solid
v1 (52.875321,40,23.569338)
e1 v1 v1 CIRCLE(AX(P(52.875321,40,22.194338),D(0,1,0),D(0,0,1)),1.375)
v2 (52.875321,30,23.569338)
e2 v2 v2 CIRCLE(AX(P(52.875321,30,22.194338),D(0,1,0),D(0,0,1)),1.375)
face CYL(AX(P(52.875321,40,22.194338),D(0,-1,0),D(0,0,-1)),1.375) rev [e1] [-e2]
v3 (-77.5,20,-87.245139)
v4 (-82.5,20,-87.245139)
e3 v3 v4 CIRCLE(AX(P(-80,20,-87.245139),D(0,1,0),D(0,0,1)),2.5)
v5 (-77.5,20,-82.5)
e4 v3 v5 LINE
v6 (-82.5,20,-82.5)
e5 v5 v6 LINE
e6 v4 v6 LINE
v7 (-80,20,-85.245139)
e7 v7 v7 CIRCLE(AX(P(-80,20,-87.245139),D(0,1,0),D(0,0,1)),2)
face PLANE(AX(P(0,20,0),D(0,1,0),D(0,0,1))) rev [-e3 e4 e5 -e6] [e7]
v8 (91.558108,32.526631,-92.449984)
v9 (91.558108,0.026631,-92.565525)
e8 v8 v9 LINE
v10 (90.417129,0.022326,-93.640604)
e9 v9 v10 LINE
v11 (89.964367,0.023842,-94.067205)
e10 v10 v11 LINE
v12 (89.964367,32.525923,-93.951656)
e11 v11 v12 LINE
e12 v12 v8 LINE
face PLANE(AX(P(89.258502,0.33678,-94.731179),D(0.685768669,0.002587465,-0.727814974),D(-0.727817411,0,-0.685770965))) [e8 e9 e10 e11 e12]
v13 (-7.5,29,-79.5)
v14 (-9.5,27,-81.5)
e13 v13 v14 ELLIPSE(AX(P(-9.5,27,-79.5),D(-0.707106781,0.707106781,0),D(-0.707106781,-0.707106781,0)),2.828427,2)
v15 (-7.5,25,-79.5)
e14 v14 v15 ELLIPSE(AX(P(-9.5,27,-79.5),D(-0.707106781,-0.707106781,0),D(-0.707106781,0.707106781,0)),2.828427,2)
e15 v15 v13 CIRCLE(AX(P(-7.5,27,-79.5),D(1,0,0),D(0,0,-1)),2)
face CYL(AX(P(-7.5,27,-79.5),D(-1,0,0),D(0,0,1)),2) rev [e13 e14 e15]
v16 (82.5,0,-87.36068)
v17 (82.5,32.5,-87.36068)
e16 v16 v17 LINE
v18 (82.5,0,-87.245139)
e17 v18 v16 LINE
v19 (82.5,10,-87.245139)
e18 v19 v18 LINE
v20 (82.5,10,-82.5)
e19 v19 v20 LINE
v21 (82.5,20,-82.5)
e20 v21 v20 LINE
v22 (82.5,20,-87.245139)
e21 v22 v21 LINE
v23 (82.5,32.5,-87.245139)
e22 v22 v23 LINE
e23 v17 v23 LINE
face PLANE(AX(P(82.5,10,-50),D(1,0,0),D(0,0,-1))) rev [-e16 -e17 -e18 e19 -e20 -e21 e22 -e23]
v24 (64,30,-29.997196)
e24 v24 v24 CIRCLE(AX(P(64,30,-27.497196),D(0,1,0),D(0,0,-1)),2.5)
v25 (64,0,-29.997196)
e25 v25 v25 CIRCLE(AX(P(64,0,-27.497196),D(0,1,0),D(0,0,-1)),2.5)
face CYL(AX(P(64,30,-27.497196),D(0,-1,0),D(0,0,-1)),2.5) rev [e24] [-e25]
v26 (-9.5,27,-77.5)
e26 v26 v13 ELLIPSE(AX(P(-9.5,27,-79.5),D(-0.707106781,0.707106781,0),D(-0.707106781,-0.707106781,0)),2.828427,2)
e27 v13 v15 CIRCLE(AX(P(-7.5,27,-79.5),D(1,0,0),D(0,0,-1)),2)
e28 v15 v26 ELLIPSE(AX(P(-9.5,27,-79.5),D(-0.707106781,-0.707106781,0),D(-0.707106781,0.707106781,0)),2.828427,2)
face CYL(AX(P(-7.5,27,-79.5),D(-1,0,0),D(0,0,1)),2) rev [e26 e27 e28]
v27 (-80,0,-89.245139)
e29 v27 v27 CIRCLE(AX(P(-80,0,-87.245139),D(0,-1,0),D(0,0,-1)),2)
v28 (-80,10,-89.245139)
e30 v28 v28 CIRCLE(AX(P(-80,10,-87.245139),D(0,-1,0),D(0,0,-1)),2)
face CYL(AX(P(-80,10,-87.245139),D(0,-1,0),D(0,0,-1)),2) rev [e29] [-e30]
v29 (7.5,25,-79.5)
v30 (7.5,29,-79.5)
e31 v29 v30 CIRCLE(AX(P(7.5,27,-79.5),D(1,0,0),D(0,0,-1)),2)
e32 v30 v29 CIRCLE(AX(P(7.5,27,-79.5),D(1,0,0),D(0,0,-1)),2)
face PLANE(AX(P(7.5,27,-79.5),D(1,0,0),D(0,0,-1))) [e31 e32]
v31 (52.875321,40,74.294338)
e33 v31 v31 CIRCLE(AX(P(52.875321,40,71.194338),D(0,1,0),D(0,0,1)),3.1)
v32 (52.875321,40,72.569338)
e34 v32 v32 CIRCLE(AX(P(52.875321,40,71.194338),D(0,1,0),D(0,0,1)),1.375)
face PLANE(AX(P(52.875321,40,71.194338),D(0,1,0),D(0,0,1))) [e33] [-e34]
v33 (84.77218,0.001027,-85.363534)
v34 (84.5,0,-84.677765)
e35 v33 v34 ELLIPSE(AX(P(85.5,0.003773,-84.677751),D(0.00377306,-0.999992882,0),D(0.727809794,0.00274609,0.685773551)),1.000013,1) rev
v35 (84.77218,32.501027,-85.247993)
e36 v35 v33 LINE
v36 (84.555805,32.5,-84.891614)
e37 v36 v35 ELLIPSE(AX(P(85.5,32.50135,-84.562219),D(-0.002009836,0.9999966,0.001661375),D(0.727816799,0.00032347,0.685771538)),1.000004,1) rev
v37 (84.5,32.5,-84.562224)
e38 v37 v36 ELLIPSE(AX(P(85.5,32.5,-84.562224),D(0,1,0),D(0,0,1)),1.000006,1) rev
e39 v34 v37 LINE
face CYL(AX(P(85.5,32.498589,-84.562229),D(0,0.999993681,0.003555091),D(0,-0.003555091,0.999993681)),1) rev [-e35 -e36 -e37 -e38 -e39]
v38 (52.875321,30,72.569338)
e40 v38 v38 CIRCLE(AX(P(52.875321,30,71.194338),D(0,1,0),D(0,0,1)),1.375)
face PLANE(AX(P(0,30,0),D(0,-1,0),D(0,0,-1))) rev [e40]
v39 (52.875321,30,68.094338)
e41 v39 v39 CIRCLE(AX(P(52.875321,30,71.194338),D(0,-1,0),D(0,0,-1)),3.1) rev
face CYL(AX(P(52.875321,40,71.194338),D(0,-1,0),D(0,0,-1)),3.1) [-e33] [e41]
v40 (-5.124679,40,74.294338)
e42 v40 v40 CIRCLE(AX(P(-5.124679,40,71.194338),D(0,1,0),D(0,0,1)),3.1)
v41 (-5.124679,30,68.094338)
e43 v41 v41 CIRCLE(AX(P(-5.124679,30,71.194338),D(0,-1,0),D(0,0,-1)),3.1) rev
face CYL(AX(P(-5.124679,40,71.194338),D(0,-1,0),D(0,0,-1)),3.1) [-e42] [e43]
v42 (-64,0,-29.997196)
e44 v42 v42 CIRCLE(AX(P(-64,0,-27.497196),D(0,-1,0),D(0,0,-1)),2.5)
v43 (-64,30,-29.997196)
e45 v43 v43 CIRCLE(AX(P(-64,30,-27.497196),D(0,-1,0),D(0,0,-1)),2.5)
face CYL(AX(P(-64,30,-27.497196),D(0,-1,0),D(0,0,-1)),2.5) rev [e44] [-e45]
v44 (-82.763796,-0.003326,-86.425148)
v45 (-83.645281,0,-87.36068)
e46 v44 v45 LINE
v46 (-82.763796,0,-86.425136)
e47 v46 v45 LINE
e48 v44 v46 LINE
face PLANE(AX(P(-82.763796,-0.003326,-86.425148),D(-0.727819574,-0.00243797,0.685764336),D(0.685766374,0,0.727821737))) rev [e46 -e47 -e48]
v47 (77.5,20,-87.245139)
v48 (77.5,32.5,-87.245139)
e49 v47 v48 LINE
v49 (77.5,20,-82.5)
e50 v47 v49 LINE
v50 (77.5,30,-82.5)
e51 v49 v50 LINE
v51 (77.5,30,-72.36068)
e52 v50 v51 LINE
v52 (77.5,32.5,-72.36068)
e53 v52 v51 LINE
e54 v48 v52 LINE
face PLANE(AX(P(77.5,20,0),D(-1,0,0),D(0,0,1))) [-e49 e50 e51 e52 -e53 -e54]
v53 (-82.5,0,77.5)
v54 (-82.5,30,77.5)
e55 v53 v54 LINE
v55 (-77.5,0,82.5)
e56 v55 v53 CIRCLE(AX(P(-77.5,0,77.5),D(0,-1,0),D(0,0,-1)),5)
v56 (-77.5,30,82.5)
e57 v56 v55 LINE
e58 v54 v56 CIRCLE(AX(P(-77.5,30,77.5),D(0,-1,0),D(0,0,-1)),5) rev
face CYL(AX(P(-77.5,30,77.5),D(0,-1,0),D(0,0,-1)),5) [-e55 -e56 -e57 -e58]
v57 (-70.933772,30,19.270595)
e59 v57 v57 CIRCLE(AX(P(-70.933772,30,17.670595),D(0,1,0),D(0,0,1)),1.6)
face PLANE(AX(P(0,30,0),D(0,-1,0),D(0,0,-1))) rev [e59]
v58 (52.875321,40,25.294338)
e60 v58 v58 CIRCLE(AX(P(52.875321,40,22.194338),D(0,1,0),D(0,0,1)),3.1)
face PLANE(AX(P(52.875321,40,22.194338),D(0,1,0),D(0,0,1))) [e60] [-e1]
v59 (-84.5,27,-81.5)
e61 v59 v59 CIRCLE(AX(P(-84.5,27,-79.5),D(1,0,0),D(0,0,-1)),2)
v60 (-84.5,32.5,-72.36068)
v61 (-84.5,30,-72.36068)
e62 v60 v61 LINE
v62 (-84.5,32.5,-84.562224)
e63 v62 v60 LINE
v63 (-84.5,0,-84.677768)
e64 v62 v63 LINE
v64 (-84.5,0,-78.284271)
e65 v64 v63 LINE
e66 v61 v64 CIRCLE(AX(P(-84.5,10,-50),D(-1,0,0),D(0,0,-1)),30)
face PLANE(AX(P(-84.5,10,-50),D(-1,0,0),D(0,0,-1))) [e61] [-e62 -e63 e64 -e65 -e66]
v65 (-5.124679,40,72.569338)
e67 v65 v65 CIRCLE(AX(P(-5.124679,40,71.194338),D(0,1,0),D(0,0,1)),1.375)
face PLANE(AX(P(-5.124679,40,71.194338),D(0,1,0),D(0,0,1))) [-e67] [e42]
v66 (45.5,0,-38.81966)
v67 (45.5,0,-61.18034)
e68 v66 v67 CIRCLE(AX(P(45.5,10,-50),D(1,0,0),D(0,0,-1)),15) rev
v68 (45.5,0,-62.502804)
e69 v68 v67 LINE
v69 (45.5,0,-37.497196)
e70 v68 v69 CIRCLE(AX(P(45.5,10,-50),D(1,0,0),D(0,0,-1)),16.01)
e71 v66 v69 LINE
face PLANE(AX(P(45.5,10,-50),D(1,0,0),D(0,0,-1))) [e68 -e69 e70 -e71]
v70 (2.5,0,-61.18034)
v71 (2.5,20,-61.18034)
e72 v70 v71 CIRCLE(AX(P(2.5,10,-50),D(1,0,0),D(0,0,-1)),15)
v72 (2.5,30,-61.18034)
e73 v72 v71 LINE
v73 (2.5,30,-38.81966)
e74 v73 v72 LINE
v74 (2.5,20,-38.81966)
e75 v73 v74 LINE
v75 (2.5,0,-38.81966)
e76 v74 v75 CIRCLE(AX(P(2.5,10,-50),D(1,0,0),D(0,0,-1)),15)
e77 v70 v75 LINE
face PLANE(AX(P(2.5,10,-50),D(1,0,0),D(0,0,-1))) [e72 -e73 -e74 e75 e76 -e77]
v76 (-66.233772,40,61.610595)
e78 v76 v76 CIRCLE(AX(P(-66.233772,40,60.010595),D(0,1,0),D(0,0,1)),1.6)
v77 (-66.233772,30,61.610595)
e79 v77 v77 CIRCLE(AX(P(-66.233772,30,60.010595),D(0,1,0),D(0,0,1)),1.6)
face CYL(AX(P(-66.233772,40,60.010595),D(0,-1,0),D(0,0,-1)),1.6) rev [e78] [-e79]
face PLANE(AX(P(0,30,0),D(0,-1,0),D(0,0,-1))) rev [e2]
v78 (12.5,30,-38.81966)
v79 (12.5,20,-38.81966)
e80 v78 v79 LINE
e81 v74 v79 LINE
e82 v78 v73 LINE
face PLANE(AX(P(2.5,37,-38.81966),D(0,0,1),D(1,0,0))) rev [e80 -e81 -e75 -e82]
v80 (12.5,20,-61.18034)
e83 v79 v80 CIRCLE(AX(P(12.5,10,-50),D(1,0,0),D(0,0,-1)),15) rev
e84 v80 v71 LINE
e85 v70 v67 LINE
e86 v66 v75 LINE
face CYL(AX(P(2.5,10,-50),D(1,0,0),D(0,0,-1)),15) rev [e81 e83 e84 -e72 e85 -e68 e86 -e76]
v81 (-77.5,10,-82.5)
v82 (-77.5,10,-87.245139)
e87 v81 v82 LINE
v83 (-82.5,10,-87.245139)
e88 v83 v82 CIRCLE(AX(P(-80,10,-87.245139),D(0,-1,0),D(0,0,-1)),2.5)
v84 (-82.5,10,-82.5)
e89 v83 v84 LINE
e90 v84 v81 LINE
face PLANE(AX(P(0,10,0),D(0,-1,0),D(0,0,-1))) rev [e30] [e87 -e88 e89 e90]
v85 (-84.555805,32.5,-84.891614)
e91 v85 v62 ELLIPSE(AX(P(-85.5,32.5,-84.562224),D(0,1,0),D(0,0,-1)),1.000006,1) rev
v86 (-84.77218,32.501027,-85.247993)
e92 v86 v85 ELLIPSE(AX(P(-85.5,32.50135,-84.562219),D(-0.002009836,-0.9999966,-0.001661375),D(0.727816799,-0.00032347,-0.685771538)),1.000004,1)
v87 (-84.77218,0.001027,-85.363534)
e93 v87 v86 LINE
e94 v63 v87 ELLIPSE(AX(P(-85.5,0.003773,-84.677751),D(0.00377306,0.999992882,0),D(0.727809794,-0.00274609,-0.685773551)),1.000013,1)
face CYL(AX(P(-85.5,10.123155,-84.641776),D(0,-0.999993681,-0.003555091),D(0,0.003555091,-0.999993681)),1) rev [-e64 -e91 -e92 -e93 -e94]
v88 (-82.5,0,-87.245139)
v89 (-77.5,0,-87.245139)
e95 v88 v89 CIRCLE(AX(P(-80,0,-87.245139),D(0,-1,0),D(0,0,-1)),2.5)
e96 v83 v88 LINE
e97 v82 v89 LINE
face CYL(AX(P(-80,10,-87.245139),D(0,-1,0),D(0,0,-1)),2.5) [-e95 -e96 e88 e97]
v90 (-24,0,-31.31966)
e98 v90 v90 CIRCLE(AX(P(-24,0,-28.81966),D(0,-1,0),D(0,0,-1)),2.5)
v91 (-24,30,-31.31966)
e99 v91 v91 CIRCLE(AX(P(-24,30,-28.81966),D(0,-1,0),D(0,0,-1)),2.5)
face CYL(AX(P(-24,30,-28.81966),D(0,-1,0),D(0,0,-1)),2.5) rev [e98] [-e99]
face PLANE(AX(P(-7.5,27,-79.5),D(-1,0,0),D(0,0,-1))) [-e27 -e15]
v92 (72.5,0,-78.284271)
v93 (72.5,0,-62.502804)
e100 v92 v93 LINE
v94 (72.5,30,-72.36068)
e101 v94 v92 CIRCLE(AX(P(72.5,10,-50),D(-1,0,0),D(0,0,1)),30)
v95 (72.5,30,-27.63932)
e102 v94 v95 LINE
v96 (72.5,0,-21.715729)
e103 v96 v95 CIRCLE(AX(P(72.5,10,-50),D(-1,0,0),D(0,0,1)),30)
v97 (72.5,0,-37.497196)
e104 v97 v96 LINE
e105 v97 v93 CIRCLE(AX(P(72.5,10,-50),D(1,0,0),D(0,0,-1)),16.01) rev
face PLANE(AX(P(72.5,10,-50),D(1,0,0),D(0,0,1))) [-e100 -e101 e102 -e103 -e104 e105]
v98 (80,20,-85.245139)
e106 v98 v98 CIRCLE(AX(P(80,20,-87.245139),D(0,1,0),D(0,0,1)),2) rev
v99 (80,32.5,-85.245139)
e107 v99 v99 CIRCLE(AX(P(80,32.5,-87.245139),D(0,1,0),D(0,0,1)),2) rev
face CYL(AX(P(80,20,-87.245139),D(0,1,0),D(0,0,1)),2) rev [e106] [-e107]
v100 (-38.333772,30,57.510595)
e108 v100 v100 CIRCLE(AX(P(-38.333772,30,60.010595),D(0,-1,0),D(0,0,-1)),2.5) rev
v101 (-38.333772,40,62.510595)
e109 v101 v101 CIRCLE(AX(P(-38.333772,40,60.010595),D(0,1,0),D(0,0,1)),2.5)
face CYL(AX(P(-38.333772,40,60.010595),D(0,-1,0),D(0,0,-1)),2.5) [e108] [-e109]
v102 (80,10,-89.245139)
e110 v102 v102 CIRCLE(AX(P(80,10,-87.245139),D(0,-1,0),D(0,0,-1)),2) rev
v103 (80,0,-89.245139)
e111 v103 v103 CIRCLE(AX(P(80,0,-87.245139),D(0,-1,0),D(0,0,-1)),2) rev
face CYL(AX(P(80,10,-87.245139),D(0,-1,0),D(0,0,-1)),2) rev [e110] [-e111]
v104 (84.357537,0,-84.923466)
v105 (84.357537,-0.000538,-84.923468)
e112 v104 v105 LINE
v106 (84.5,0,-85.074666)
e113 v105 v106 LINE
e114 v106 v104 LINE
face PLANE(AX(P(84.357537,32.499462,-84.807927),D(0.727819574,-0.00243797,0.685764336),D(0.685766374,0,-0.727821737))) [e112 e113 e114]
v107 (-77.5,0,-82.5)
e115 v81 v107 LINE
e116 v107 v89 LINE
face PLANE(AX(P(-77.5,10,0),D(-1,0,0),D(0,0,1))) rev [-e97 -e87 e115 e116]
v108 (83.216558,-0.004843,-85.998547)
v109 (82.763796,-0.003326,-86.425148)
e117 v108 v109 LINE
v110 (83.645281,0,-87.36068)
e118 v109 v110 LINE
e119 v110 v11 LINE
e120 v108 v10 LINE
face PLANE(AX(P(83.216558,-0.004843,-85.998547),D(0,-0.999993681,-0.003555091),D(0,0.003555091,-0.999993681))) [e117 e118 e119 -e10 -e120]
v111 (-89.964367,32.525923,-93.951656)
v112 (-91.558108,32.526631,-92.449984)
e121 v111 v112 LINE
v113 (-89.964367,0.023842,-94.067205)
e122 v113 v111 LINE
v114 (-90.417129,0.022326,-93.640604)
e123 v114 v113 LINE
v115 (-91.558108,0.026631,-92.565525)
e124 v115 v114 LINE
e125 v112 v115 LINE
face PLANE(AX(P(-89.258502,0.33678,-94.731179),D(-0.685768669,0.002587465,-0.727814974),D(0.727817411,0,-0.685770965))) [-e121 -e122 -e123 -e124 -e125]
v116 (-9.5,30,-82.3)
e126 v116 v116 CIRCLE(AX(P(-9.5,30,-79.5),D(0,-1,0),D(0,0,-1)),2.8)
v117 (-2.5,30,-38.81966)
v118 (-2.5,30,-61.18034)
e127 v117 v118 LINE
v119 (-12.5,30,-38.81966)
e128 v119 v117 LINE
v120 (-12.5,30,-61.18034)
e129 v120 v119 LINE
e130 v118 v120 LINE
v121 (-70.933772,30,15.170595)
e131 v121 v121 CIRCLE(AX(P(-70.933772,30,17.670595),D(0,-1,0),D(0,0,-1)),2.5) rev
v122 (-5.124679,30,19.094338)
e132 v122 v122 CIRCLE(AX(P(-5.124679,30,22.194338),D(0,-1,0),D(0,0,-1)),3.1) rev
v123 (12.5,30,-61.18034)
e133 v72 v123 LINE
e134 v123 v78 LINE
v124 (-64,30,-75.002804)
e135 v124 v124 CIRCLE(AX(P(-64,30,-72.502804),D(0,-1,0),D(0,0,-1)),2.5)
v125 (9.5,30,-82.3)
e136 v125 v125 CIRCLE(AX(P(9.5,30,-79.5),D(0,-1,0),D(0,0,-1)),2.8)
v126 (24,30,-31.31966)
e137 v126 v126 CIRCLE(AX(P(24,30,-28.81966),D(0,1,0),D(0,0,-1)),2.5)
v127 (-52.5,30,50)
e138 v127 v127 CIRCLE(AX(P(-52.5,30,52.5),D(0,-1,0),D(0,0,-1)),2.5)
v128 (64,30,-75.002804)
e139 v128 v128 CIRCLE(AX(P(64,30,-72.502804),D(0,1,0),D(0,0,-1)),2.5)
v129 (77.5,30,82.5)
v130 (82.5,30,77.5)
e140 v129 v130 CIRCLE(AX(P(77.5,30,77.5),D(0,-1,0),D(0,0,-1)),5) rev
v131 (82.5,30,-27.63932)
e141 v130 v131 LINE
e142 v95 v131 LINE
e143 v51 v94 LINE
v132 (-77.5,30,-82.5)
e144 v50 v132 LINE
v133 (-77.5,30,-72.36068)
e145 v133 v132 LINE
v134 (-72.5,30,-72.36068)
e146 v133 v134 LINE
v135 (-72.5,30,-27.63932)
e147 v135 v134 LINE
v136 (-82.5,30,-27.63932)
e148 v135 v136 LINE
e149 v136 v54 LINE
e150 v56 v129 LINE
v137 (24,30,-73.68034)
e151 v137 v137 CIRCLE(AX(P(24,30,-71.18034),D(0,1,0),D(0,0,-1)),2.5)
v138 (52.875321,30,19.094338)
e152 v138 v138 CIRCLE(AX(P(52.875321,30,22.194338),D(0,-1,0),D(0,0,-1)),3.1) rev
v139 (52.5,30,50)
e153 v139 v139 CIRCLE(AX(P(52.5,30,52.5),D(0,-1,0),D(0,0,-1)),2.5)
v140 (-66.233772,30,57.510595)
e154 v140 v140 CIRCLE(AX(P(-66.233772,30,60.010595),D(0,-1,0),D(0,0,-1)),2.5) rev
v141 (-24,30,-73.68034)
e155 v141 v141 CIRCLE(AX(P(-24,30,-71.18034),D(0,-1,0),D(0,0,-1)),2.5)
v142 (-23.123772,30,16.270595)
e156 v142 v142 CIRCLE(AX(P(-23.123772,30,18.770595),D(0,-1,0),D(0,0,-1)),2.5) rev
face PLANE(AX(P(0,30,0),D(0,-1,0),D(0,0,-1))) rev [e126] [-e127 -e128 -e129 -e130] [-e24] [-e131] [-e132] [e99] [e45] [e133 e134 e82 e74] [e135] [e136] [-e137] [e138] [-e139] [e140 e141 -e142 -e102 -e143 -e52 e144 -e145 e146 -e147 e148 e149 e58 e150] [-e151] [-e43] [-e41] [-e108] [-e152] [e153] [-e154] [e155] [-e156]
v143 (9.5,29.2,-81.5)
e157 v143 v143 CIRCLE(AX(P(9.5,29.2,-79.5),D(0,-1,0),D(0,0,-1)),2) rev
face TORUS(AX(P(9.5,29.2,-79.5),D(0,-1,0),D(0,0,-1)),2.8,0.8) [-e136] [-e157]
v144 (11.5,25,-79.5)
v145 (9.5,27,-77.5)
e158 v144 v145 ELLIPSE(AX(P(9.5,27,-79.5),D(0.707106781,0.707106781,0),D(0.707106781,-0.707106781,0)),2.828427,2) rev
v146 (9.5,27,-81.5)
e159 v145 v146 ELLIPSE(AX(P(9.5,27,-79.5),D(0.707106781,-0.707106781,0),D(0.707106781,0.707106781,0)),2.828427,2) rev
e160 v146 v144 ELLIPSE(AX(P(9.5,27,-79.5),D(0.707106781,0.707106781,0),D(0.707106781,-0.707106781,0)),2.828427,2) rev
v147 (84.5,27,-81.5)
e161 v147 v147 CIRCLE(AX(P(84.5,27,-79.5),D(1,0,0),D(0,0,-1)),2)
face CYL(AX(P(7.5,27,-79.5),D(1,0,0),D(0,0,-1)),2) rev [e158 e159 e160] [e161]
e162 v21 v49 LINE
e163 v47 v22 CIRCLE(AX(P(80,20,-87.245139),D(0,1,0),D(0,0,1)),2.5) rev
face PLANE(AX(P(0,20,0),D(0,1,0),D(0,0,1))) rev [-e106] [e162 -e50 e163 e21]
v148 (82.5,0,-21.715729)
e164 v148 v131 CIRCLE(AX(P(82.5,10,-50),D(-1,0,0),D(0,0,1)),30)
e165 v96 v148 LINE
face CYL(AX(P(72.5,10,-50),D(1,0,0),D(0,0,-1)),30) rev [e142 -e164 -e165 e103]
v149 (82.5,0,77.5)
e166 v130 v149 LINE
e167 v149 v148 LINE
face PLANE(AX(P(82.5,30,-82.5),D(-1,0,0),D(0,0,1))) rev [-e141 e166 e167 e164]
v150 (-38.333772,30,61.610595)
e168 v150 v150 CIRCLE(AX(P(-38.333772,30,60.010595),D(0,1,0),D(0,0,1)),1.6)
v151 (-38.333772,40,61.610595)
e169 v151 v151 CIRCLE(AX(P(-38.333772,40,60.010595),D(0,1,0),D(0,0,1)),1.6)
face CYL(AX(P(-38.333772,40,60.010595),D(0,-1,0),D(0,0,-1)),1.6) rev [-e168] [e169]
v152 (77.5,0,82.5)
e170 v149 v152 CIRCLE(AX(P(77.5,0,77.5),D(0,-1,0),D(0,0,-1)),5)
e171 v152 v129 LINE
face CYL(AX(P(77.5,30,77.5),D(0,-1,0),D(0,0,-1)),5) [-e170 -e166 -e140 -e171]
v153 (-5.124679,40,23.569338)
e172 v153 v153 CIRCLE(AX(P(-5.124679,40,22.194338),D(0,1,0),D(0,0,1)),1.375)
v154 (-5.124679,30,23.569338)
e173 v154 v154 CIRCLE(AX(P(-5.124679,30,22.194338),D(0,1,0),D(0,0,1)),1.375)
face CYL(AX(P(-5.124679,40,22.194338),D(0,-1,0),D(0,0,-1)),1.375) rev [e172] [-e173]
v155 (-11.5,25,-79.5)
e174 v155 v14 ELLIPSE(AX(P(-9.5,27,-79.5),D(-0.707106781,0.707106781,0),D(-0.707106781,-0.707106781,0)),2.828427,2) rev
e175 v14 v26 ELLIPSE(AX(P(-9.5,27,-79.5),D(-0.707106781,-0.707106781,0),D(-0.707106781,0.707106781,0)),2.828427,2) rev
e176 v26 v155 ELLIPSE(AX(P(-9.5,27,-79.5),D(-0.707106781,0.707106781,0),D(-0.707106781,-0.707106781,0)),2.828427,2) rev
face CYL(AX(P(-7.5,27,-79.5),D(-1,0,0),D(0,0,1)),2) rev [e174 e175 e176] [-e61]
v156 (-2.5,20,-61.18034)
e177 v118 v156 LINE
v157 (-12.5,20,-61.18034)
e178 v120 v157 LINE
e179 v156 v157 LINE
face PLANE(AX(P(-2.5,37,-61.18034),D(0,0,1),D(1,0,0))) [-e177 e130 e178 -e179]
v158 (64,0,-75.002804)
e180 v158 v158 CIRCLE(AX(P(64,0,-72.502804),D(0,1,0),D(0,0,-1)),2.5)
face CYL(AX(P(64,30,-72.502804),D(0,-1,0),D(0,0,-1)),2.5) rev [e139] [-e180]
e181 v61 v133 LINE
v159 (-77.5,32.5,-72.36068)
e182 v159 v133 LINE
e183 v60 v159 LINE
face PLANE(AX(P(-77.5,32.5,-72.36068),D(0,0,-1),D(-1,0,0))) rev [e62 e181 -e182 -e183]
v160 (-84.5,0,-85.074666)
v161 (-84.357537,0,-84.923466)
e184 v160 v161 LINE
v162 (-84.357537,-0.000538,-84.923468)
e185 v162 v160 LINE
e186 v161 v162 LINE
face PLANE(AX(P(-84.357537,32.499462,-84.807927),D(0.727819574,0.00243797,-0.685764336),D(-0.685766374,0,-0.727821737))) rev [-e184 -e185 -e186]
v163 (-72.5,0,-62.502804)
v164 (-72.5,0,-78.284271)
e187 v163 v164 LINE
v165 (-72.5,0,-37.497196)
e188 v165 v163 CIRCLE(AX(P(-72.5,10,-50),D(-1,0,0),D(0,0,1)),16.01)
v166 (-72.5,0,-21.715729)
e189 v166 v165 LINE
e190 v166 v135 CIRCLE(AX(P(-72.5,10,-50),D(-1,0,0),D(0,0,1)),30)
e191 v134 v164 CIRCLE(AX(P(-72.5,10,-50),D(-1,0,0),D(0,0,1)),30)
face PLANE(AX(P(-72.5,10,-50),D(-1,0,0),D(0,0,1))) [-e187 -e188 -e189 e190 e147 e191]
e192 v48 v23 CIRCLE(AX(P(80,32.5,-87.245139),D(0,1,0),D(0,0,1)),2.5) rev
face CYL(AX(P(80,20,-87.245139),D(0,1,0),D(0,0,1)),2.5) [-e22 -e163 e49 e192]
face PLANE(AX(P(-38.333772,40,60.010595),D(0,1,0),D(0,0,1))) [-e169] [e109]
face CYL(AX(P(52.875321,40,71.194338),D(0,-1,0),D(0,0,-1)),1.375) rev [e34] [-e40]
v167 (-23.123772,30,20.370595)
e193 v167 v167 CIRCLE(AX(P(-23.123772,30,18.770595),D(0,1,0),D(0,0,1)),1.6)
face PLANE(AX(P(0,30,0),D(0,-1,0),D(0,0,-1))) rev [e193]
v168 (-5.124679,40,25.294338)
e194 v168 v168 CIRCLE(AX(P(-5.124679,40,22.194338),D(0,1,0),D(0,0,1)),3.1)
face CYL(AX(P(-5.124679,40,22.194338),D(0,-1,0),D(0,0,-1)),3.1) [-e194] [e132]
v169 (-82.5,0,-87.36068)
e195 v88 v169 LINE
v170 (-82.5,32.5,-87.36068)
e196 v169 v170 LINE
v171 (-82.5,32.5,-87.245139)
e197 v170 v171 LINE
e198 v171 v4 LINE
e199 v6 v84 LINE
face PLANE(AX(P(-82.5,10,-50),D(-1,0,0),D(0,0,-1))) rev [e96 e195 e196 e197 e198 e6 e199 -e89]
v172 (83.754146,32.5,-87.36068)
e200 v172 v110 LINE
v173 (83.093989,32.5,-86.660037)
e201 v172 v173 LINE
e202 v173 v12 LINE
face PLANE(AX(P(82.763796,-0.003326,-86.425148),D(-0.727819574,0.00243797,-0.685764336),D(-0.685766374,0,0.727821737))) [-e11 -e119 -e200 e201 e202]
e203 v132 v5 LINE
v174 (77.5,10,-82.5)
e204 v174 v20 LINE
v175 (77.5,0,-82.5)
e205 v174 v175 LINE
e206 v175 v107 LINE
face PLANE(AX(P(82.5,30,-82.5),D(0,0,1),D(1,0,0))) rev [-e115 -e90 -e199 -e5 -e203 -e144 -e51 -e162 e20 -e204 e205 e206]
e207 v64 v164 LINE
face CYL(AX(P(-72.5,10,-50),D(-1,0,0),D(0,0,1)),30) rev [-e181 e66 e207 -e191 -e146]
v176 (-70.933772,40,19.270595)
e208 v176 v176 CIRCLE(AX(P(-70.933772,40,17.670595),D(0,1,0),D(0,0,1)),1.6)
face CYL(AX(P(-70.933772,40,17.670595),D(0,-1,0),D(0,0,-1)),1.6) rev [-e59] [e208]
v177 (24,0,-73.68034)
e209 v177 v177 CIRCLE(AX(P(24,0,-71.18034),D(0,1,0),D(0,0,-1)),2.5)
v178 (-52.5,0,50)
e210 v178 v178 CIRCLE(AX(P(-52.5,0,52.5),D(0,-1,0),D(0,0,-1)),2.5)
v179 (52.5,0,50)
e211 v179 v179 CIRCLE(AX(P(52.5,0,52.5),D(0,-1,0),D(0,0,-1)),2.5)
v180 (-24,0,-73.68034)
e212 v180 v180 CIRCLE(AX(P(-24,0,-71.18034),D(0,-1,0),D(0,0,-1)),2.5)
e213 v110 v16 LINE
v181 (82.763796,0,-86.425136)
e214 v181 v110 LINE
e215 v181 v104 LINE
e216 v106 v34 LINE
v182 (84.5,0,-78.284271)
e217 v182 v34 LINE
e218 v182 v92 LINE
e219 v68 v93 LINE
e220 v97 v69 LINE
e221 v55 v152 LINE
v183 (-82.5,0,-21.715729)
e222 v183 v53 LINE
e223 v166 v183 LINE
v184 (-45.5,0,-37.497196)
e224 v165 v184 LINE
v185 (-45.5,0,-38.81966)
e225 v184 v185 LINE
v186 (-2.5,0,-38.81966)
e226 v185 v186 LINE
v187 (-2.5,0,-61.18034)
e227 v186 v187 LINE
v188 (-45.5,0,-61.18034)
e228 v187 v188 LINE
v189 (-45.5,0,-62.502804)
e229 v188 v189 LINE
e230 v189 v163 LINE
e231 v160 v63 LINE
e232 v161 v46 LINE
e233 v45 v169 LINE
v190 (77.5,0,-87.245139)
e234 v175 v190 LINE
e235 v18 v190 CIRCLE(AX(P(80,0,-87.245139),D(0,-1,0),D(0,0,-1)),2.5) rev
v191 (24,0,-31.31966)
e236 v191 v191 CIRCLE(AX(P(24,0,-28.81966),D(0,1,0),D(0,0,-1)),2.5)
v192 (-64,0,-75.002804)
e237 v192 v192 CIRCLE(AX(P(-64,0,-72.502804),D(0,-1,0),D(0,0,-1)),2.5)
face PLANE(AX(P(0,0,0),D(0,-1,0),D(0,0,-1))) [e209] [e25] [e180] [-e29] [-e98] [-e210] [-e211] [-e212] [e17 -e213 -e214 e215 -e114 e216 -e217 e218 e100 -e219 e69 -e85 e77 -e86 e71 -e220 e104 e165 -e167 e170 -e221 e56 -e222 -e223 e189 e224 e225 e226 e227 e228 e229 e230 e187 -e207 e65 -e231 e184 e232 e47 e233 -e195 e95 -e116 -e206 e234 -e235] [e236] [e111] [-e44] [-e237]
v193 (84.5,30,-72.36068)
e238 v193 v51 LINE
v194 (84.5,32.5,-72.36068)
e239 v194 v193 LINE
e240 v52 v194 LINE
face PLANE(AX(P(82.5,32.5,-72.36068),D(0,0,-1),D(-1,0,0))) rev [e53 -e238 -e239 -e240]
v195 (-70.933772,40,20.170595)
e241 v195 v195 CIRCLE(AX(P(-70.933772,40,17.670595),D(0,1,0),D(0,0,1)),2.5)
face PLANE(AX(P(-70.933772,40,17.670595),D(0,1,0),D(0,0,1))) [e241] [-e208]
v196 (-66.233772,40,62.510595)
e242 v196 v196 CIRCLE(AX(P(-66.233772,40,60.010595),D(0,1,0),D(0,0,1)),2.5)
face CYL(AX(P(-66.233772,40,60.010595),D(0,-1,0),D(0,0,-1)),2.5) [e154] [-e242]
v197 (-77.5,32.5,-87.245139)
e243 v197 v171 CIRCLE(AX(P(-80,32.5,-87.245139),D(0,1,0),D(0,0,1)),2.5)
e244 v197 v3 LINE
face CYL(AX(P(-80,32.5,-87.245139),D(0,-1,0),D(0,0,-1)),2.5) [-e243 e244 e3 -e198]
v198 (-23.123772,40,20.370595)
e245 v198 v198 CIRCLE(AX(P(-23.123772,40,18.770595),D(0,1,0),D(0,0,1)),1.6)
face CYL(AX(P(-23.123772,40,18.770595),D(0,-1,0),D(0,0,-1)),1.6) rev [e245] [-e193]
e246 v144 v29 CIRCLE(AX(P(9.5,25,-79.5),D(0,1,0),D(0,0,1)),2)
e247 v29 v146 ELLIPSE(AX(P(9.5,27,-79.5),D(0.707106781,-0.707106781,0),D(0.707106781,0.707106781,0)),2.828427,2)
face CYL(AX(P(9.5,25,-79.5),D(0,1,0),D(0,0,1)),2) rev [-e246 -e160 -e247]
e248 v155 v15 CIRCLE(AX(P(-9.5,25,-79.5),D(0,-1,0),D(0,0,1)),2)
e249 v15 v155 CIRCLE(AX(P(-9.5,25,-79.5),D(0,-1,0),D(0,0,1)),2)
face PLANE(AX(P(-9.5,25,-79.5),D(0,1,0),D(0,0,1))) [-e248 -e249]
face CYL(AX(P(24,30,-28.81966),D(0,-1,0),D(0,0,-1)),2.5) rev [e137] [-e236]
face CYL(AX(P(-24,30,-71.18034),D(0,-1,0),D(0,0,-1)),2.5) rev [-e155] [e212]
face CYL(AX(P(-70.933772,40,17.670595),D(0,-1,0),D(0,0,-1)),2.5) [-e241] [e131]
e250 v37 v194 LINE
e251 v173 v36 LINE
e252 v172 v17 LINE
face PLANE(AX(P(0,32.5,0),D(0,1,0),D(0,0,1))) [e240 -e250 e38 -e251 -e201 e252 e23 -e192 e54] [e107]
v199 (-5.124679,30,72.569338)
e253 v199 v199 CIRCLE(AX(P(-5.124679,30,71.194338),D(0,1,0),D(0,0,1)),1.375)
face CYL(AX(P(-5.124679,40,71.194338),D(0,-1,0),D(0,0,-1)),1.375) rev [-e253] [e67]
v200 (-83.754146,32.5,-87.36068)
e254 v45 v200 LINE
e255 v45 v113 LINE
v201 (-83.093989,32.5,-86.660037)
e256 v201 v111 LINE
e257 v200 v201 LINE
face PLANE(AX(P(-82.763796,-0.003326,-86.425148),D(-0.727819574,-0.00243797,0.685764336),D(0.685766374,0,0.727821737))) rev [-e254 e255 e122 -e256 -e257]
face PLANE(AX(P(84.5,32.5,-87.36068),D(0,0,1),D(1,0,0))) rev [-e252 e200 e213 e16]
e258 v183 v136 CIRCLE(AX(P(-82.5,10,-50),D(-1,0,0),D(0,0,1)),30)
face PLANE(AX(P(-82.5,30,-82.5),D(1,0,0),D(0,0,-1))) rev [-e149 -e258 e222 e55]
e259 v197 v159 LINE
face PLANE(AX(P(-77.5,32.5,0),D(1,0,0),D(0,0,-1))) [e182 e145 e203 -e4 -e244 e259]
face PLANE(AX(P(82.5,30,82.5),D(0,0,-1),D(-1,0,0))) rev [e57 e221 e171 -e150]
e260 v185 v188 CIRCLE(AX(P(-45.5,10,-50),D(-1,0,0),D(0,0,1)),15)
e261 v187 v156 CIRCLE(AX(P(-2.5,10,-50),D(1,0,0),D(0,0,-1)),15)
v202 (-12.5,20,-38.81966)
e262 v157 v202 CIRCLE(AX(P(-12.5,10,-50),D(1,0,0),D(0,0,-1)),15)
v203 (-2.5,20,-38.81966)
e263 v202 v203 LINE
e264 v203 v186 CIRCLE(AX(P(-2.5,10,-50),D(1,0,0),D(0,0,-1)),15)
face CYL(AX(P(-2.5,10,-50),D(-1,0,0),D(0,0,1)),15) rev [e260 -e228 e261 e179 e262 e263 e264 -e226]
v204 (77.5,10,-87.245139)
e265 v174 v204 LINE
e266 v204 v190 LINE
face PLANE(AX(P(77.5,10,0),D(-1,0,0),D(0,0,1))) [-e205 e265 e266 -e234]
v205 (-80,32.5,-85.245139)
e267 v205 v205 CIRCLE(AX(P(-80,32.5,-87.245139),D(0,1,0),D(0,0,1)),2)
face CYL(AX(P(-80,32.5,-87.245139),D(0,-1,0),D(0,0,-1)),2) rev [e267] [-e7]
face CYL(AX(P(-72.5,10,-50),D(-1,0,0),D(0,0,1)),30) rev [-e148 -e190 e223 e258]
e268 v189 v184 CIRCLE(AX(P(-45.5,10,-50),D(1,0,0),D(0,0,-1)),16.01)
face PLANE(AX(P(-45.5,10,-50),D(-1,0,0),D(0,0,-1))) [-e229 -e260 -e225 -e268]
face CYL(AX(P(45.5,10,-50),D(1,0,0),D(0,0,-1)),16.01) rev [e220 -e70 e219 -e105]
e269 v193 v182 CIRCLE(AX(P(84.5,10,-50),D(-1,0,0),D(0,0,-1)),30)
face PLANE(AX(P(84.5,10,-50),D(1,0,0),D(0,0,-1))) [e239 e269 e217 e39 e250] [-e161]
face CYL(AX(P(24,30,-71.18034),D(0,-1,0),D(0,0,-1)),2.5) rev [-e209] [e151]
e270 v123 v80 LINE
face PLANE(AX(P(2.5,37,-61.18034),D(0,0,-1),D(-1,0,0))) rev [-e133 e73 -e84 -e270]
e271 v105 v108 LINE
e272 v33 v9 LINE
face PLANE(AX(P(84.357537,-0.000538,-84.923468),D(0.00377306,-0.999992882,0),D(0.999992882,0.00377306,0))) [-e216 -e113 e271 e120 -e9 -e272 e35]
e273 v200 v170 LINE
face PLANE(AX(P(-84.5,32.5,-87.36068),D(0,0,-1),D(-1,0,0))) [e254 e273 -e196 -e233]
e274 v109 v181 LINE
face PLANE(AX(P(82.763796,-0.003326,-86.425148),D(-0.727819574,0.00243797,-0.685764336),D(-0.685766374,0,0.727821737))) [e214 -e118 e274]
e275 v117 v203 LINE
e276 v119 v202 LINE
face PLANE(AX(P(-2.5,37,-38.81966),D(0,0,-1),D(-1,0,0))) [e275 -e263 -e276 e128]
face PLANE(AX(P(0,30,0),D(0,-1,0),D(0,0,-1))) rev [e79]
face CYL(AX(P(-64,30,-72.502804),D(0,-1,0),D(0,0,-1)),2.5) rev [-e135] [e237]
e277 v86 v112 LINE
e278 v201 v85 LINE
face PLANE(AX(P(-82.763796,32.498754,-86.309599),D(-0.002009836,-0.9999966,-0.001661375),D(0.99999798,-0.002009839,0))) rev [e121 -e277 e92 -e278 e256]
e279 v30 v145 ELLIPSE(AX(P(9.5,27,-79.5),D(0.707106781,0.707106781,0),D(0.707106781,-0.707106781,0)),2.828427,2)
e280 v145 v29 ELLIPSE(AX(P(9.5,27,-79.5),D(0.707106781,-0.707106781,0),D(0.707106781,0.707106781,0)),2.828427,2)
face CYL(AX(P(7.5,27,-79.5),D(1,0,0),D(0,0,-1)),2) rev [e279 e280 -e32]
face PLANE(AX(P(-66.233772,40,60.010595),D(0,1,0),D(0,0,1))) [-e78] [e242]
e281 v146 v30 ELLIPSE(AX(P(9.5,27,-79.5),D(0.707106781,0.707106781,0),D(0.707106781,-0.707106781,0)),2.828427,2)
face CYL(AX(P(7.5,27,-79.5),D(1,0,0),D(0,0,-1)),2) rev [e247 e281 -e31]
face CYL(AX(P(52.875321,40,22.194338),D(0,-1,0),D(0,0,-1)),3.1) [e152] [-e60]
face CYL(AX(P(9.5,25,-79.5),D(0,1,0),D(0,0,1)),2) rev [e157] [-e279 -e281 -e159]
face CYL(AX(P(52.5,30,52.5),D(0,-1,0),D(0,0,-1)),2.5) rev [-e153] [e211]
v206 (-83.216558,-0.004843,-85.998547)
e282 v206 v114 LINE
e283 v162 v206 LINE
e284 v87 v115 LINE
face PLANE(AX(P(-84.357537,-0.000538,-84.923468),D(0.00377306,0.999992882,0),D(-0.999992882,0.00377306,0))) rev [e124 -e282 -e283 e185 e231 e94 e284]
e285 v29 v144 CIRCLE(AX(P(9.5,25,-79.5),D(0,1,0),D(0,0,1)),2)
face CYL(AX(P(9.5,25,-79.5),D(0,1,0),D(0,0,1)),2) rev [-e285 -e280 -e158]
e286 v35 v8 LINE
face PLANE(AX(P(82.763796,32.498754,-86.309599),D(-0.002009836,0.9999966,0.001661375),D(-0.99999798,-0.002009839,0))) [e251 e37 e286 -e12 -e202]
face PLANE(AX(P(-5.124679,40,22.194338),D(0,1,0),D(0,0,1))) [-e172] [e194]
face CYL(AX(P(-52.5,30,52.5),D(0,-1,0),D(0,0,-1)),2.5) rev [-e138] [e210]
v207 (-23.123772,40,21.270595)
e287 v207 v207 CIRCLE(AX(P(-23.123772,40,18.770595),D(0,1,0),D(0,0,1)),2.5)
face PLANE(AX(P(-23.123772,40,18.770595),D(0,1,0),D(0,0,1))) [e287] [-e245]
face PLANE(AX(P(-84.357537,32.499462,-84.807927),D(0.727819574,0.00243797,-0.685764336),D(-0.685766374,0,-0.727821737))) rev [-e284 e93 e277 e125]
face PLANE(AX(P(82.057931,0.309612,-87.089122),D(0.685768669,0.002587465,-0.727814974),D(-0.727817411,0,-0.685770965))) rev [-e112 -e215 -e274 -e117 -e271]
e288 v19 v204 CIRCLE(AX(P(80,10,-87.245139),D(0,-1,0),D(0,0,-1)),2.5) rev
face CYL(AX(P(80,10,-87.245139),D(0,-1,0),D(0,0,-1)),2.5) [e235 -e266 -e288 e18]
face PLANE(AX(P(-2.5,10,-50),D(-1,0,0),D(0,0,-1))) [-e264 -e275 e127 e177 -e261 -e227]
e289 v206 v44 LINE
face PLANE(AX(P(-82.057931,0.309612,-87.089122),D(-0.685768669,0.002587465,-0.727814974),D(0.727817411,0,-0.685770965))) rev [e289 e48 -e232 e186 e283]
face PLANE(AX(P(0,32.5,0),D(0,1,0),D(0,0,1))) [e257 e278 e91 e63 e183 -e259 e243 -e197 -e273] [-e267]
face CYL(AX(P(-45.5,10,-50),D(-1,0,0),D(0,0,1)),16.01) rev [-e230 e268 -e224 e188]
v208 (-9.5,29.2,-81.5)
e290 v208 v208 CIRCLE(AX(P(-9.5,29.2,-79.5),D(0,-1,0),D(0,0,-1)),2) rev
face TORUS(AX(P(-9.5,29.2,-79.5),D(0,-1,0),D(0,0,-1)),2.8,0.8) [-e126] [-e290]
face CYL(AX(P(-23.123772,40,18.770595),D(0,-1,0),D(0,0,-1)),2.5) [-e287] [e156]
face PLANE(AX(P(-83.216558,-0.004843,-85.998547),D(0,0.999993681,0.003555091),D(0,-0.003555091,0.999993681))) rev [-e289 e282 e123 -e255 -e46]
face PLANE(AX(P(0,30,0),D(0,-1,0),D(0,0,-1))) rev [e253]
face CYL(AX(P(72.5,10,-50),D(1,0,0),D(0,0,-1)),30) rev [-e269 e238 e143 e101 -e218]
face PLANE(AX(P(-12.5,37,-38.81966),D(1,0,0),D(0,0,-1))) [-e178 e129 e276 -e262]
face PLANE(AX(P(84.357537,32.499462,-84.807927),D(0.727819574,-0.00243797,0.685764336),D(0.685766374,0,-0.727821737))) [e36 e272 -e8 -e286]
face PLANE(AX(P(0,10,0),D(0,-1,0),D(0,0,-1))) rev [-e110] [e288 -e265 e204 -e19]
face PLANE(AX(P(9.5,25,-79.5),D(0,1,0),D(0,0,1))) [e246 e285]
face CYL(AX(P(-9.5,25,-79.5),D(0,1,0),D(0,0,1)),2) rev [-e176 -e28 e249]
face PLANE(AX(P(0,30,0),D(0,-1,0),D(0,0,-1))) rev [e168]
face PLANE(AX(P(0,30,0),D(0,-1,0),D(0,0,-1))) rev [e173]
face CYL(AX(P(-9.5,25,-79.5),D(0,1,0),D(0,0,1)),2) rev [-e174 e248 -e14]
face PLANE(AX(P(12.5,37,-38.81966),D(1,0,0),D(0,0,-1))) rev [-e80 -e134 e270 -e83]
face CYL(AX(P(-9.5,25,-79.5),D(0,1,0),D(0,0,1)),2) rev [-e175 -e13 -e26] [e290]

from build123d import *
from build123d.topology import SkipClean

# Parameters (mm, degrees)
ESQUISSE2_W             = 165
ESQUISSE2_H             = 165
BASE_DEPTH              = 30
ESQUISSE3_R             = 15
BLOC_MOTEUR_1_DEPTH     = 80
ESQUISSE4_W             = 10
ESQUISSE4_H             = 22.360679774
ACCES_MOTEUR_DEPTH      = 37
ESQUISSE6_R             = 16.01
BLOC_MOTEUR_2_DEPTH     = 37
ESQUISSE7_R             = 2.5
VIS_MOTEUR_DEPTH        = 121.467838032
ESQUISSE8_R             = 2.5
VIS_PATIN_DEPTH         = 121.467838032
ESQUISSE9_R             = 3.1
ESQUISSE9_R_2           = 1.375
SUPPORT_RASP_DEPTH      = 10
ESQUISSE11_R            = 2.5
ESQUISSE11_R_2          = 1.6
SUPPORT_ARDUINO_DEPTH   = 10
CONGE_EXT_R             = 5
ESQUISSE12_R            = 30
ESPACE_ROUE_DEPTH       = 10
FIXE_PORTE_1_DEPTH      = 2.5
FIXE_PORTE_1_DEPTH_BACK = 10
ESQUISSE14_R            = 2
ESQUISSE15_W            = 5
ESQUISSE15_H            = 10.139320225
FIXE_PORTE_2_DEPTH      = 2.5
ESQUISSE16_R            = 2
FIXE_PORTE_3_DEPTH      = 10
ESQUISSE18_R            = 2
VIDE_CORDE_COTE_DEPTH   = 75
ESQUISSE19_R            = 2
VIDEO_CORDE_HAUT_DEPTH  = 5
CONGE_CORDE_R           = 0.8
ESQUISSE20_R            = 2
BOSS_MAX_PORTE_DEPTH    = 2
BOSS_START              = -0.5
BOSS_PORTE_45_DEPTH     = 10.5
CONGE_PORTE_45_R        = 1


with BuildPart() as part:
    # Esquisse2 → BASE (new body)
    with BuildSketch(Plane(origin=(0, 0, 0), x_dir=(1, 0, 0), z_dir=(0, 1, 0))):
        Rectangle(ESQUISSE2_W, ESQUISSE2_H)
    extrude(amount=BASE_DEPTH)

    # Esquisse3 → BLOC MOTEUR 1. (cut)
    with BuildSketch(Plane(origin=(82.5, 0, 0), x_dir=(0, 0, -1), z_dir=(1, 0, 0))):
        with Locations((50, 10)):
            Circle(ESQUISSE3_R)
    bloc_moteur_1 = extrude(amount=-BLOC_MOTEUR_1_DEPTH, mode=Mode.SUBTRACT)

    # Esquisse4 → ACCES MOTEUR (cut)
    with BuildSketch(Plane.XZ):
        with Locations((7.5, -50)):
            Rectangle(ESQUISSE4_W, ESQUISSE4_H)
    acces_moteur = extrude(amount=-ACCES_MOTEUR_DEPTH, mode=Mode.SUBTRACT)

    # Esquisse6 → BLOC MOTEUR 2 (cut)
    with BuildSketch(Plane(origin=(82.5, 0, 0), x_dir=(0, 0, -1), z_dir=(1, 0, 0))):
        with Locations((50, 10)):
            Circle(ESQUISSE6_R)
    bloc_moteur_2 = extrude(amount=-BLOC_MOTEUR_2_DEPTH, mode=Mode.SUBTRACT)

    # SYM BLOC MOTEUR: BLOC MOTEUR 1., ACCES MOTEUR, BLOC MOTEUR 2 across plane
    add(bloc_moteur_1.mirror(Plane(origin=(0, 0, 0), x_dir=(0, 0, 1), z_dir=(1, 0, 0))), mode=Mode.SUBTRACT)
    add(acces_moteur.mirror(Plane(origin=(0, 0, 0), x_dir=(0, 0, 1), z_dir=(1, 0, 0))), mode=Mode.SUBTRACT)
    add(bloc_moteur_2.mirror(Plane(origin=(0, 0, 0), x_dir=(0, 0, 1), z_dir=(1, 0, 0))), mode=Mode.SUBTRACT)

    # Esquisse7 → VIS MOTEUR (cut, through all)
    with BuildSketch(Plane.XZ):
        with Locations(Location((-64, -27.497196314, 0), (0, 0, 270))):
            Circle(ESQUISSE7_R)
        with Locations(Location((-24, -28.819660113, 0), (0, 0, 270))):
            Circle(ESQUISSE7_R)
        with Locations(Location((-24, -71.180339887, 0), (0, 0, 270))):
            Circle(ESQUISSE7_R)
        with Locations(Location((-64, -72.502803686, 0), (0, 0, 270))):
            Circle(ESQUISSE7_R)
    vis_moteur = extrude(amount=-VIS_MOTEUR_DEPTH, mode=Mode.SUBTRACT)

    # SYM VIS: VIS MOTEUR across plane
    add(vis_moteur.mirror(Plane(origin=(0, 0, 0), x_dir=(0, 0, 1), z_dir=(1, 0, 0))), mode=Mode.SUBTRACT)

    # Esquisse8 → VIS PATIN (cut, through all)
    with BuildSketch(Plane.XZ):
        with Locations(Location((-52.5, 52.5, 0), (0, 0, 270))):
            Circle(ESQUISSE8_R)
        with Locations(Location((52.5, 52.5, 0), (0, 0, 270))):
            Circle(ESQUISSE8_R)
    extrude(amount=-VIS_PATIN_DEPTH, mode=Mode.SUBTRACT)

    # Esquisse9 → SUPPORT RASP (add)
    # profile 1 of 4: a face of its own
    with BuildSketch(Plane(origin=(0, 30, 0), x_dir=(1, 0, 0), z_dir=(0, 1, 0))):
        with Locations(Location((-5.124679211, -22.194338496, 0), (0, 0, 90))):
            Circle(ESQUISSE9_R)
        with Locations(Location((-5.124679211, -22.194338496, 0), (0, 0, 270))):
            Circle(ESQUISSE9_R_2, mode=Mode.SUBTRACT)
    # profile 2 of 4: a face of its own
    with BuildSketch(Plane(origin=(0, 30, 0), x_dir=(1, 0, 0), z_dir=(0, 1, 0))):
        with Locations(Location((52.875320789, -22.194338496, 0), (0, 0, 90))):
            Circle(ESQUISSE9_R)
        with Locations(Location((52.875320789, -22.194338496, 0), (0, 0, 270))):
            Circle(ESQUISSE9_R_2, mode=Mode.SUBTRACT)
    # profile 3 of 4: a face of its own
    with BuildSketch(Plane(origin=(0, 30, 0), x_dir=(1, 0, 0), z_dir=(0, 1, 0))):
        with Locations(Location((-5.124679211, -71.194338496, 0), (0, 0, 90))):
            Circle(ESQUISSE9_R)
        with Locations(Location((-5.124679211, -71.194338496, 0), (0, 0, 270))):
            Circle(ESQUISSE9_R_2, mode=Mode.SUBTRACT)
    # profile 4 of 4: a face of its own
    with BuildSketch(Plane(origin=(0, 30, 0), x_dir=(1, 0, 0), z_dir=(0, 1, 0))):
        with Locations(Location((52.875320789, -71.194338496, 0), (0, 0, 90))):
            Circle(ESQUISSE9_R)
        with Locations(Location((52.875320789, -71.194338496, 0), (0, 0, 270))):
            Circle(ESQUISSE9_R_2, mode=Mode.SUBTRACT)
    extrude(amount=SUPPORT_RASP_DEPTH)

    # Esquisse11 → SUPPORT ARDUINO (add)
    # profile 1 of 4: a face of its own
    with BuildSketch(Plane(origin=(0, 30, 0), x_dir=(1, 0, 0), z_dir=(0, 1, 0))):
        with Locations(Location((-70.933772323, -17.670594659, 0), (0, 0, 90))):
            Circle(ESQUISSE11_R)
        with Locations(Location((-70.933772323, -17.670594659, 0), (0, 0, 270))):
            Circle(ESQUISSE11_R_2, mode=Mode.SUBTRACT)
    # profile 2 of 4: a face of its own
    with BuildSketch(Plane(origin=(0, 30, 0), x_dir=(1, 0, 0), z_dir=(0, 1, 0))):
        with Locations(Location((-23.123772323, -18.770594659, 0), (0, 0, 90))):
            Circle(ESQUISSE11_R)
        with Locations(Location((-23.123772323, -18.770594659, 0), (0, 0, 270))):
            Circle(ESQUISSE11_R_2, mode=Mode.SUBTRACT)
    # profile 3 of 4: a face of its own
    with BuildSketch(Plane(origin=(0, 30, 0), x_dir=(1, 0, 0), z_dir=(0, 1, 0))):
        with Locations(Location((-66.233772323, -60.010594659, 0), (0, 0, 90))):
            Circle(ESQUISSE11_R)
        with Locations(Location((-66.233772323, -60.010594659, 0), (0, 0, 270))):
            Circle(ESQUISSE11_R_2, mode=Mode.SUBTRACT)
    # profile 4 of 4: a face of its own
    with BuildSketch(Plane(origin=(0, 30, 0), x_dir=(1, 0, 0), z_dir=(0, 1, 0))):
        with Locations(Location((-38.333772323, -60.010594659, 0), (0, 0, 90))):
            Circle(ESQUISSE11_R)
        with Locations(Location((-38.333772323, -60.010594659, 0), (0, 0, 270))):
            Circle(ESQUISSE11_R_2, mode=Mode.SUBTRACT)
    extrude(amount=SUPPORT_ARDUINO_DEPTH)

    # CONGE EXT
    conge_ext_edges = [part.edges().sort_by_distance(p)[0] for p in [
        (82.5, 15, 82.5),
        (-82.5, 15, 82.5),
    ]]
    fillet(conge_ext_edges, radius=CONGE_EXT_R)

    # Esquisse12 → ESPACE ROUE (cut)
    with BuildSketch(Plane.ZY.offset(82.5)):
        with Locations((-50, 10)):
            Circle(ESQUISSE12_R)
    espace_roue = extrude(amount=-ESPACE_ROUE_DEPTH, mode=Mode.SUBTRACT)

    # SYM ESPACE ROUE: ESPACE ROUE across plane
    add(espace_roue.mirror(Plane(origin=(0, 0, 0), x_dir=(0, 0, 1), z_dir=(1, 0, 0))), mode=Mode.SUBTRACT)

    # Esquisse14 → FIXE PORTE 1 (add, two sides: drawn at the far end of the back side and taken through both)
    # profile 1 of 2: a face of its own
    with BuildSketch(Plane(origin=(0, 30, 0), x_dir=(1, 0, 0), z_dir=(0, 1, 0)).offset(-FIXE_PORTE_1_DEPTH_BACK)):
        with BuildLine():
            ThreePointArc((-77.5, 87.245138583), (-80, 89.745138583), (-82.5, 87.245138583))
            Line((-82.5, 87.245138583), (-82.5, 82.5))
            Line((-82.5, 82.5), (-77.5, 82.5))
            Line((-77.5, 82.5), (-77.5, 87.245138583))
        make_face()
        with Locations(Location((-80, 87.245138583, 0), (0, 0, 270))):
            Circle(ESQUISSE14_R, mode=Mode.SUBTRACT)
    # profile 2 of 2: a face of its own
    with BuildSketch(Plane(origin=(0, 30, 0), x_dir=(1, 0, 0), z_dir=(0, 1, 0)).offset(-FIXE_PORTE_1_DEPTH_BACK)):
        with BuildLine():
            Line((77.5, 87.245138583), (77.5, 82.5))
            Line((77.5, 82.5), (82.5, 82.5))
            Line((82.5, 82.5), (82.5, 87.245138583))
            ThreePointArc((82.5, 87.245138583), (80, 89.745138583), (77.5, 87.245138583))
        make_face()
        with Locations(Location((80, 87.245138583, 0), (0, 0, 270))):
            Circle(ESQUISSE14_R, mode=Mode.SUBTRACT)
    extrude(amount=FIXE_PORTE_1_DEPTH + FIXE_PORTE_1_DEPTH_BACK)

    # Esquisse15 → FIXE PORTE 2 (add)
    with BuildSketch(Plane(origin=(0, 30, 0), x_dir=(1, 0, 0), z_dir=(0, 1, 0))):
        with Locations((-80, 77.430339887)):
            Rectangle(ESQUISSE15_W, ESQUISSE15_H)
        with Locations((80, 77.430339887)):
            Rectangle(ESQUISSE15_W, ESQUISSE15_H)
    extrude(amount=FIXE_PORTE_2_DEPTH)

    # Esquisse16 → FIXE PORTE 3 (add)
    # profile 1 of 2: a face of its own
    with BuildSketch(Plane.XZ):
        with BuildLine():
            Line((-82.5, -82.5), (-82.5, -87.245138583))
            ThreePointArc((-82.5, -87.245138583), (-80, -89.745138583), (-77.5, -87.245138583))
            Line((-77.5, -87.245138583), (-77.5, -82.5))
            Line((-77.5, -82.5), (-82.5, -82.5))
        make_face()
        with Locations(Location((-80, -87.245138583, 0), (0, 0, 90))):
            Circle(ESQUISSE16_R, mode=Mode.SUBTRACT)
    # profile 2 of 2: a face of its own
    with BuildSketch(Plane.XZ):
        with BuildLine():
            Line((82.5, -82.5), (77.5, -82.5))
            Line((77.5, -82.5), (77.5, -87.245138583))
            ThreePointArc((77.5, -87.245138583), (80, -89.745138583), (82.5, -87.245138583))
            Line((82.5, -87.245138583), (82.5, -82.5))
        make_face()
        with Locations(Location((80, -87.245138583, 0), (0, 0, 90))):
            Circle(ESQUISSE16_R, mode=Mode.SUBTRACT)
    extrude(amount=-FIXE_PORTE_3_DEPTH)

    # Esquisse18 → VIDE CORDE COTE (cut)
    with BuildSketch(Plane(origin=(82.5, 0, 0), x_dir=(0, 0, -1), z_dir=(1, 0, 0))):
        with Locations((79.5, 27)):
            Circle(ESQUISSE18_R)
    vide_corde_cote = extrude(amount=-VIDE_CORDE_COTE_DEPTH, mode=Mode.SUBTRACT)

    # Esquisse19 → VIDEO CORDE HAUT (cut)
    with BuildSketch(Plane(origin=(0, 30, 0), x_dir=(1, 0, 0), z_dir=(0, 1, 0))):
        with Locations(Location((9.5, 79.5, 0), (0, 0, 270))):
            Circle(ESQUISSE19_R)
    video_corde_haut = extrude(amount=-VIDEO_CORDE_HAUT_DEPTH, mode=Mode.SUBTRACT)

    # SYM CORDE: VIDE CORDE COTE, VIDEO CORDE HAUT across plane
    add(vide_corde_cote.mirror(Plane(origin=(0, 0, 0), x_dir=(0, 0, 1), z_dir=(1, 0, 0))), mode=Mode.SUBTRACT)
    add(video_corde_haut.mirror(Plane(origin=(0, 0, 0), x_dir=(0, 0, 1), z_dir=(1, 0, 0))), mode=Mode.SUBTRACT)

    # CONGE CORDE
    conge_corde_edges = [part.edges().sort_by_distance(p)[0] for p in [
        (9.5, 30, -81.5),
        (-9.5, 30, -81.5),
    ]]
    fillet(conge_corde_edges, radius=CONGE_CORDE_R)

    # Esquisse20 → BOSS MAX PORTE (add)
    with SkipClean():  # the faces are left unmerged after this step: merging them gives an invalid solid
        with BuildSketch(Plane(origin=(82.5, 0, 0), x_dir=(0, 0, -1), z_dir=(1, 0, 0))):
            with BuildLine():
                Line((72.360679775, 30), (72.360679775, 32.5))
                Line((72.360679775, 32.5), (87.360679775, 32.5))
                Line((87.360679775, 32.5), (87.360679775, 0))
                Line((87.360679775, 0), (78.284271247, 0))
                ThreePointArc((78.284271247, 0), (79.431747587, 15.811388301), (72.360679775, 30))
            make_face()
            with Locations((79.5, 27)):
                Circle(ESQUISSE20_R, mode=Mode.SUBTRACT)
        boss_max_porte = extrude(amount=BOSS_MAX_PORTE_DEPTH)

    # SYM MAX PORTE: BOSS MAX PORTE across plane
    with SkipClean():  # the faces are left unmerged after this step: merging them gives an invalid solid
        add(boss_max_porte.mirror(Plane(origin=(0, 0, 0), x_dir=(0, 0, 1), z_dir=(1, 0, 0))))

    # Esquisse22 → BOSS PORTE 45 (add)
    with SkipClean():  # the faces are left unmerged after this step: merging them gives an invalid solid
        with BuildSketch(Plane(origin=(82.400815449, 0.310905454, -87.453029071), x_dir=(-0.7278195737700707, 0.0024379701221012664, -0.6857643358609695), z_dir=(0.6857686694776547, 0.0025874649194508412, -0.7278149744187309)).offset(BOSS_START)):
            Polygon((-1.591915437, -0.310575179), (-0.969834451, -0.310575179), (-0.969834451, 32.19171029), (-3.159582394, 32.19775719), (-3.159582394, -0.30244819), align=None)
        boss_porte_45 = extrude(amount=BOSS_PORTE_45_DEPTH)

    # SYM MAX PORTE 45: BOSS PORTE 45 across plane
    with SkipClean():  # the faces are left unmerged after this step: merging them gives an invalid solid
        add(boss_porte_45.mirror(Plane(origin=(0, 0, 0), x_dir=(0, 0, 1), z_dir=(1, 0, 0))))

    # CONGE PORTE 45
    # the kernel refuses this fillet: 1 mm, written as the material it adds along each edge
    with BuildSketch(Plane(origin=(84.5, 33.492239506, -84.955596936), x_dir=(0, -0.0035550911416795607, 0.99999368064352), z_dir=(0, -0.9999936806435201, -0.003555091141679561))) as conge_porte_45_piece_1_section:
        with BuildLine():
            CenterArc((CONGE_PORTE_45_R * 0.396898310384, -CONGE_PORTE_45_R), CONGE_PORTE_45_R, 90, 43.296088669)
            Line((-CONGE_PORTE_45_R * 0.288870359094, -CONGE_PORTE_45_R * 0.27218042623), (0, 0))
            Line((0, 0), (CONGE_PORTE_45_R * 0.396898310384, 0))
        make_face()
    conge_porte_45_piece_1 = extrude(amount=34.484696932, mode=Mode.PRIVATE)
    conge_porte_45_piece_1 = split(conge_porte_45_piece_1, bisect_by=Plane(origin=(84.651606735, 32.5, -85.118504897), z_dir=(0, 1, 0)), keep=Keep.TOP, mode=Mode.PRIVATE)
    conge_porte_45_piece_1 = split(conge_porte_45_piece_1, bisect_by=Plane(origin=(84.651606162, 32.500569495, -85.118504424), z_dir=(0.002009836443436163, -0.9999966001902965, -0.001661374527015314)), keep=Keep.TOP, mode=Mode.PRIVATE)
    add(conge_porte_45_piece_1)
    with BuildSketch(Plane(origin=(84.5, 33.492239506, -84.955596936), x_dir=(0, -0.0035550911416795607, 0.99999368064352), z_dir=(0, -0.9999936806435201, -0.003555091141679561))) as conge_porte_45_piece_2_section:
        with BuildLine():
            CenterArc((CONGE_PORTE_45_R * 0.396898310384, -CONGE_PORTE_45_R), CONGE_PORTE_45_R, 90, 43.296088669)
            Line((-CONGE_PORTE_45_R * 0.288870359094, -CONGE_PORTE_45_R * 0.27218042623), (0, 0))
            Line((0, 0), (CONGE_PORTE_45_R * 0.396898310384, 0))
        make_face()
    conge_porte_45_piece_2 = extrude(amount=34.484696932, mode=Mode.PRIVATE)
    conge_porte_45_piece_2 = split(conge_porte_45_piece_2, bisect_by=Plane(origin=(84.497035788, 32.5, -84.725812597), z_dir=(0, -1, 0)), keep=Keep.TOP, mode=Mode.PRIVATE)
    conge_porte_45_piece_2 = split(conge_porte_45_piece_2, bisect_by=Plane(origin=(84.497036184, 32.499606424, -84.725812924), z_dir=(-0.002009836443436163, 0.9999966001902965, 0.001661374527015314)), keep=Keep.TOP, mode=Mode.PRIVATE)
    add(conge_porte_45_piece_2)
    with BuildSketch(Plane(origin=(84.5, 33.492239506, -84.955596936), x_dir=(0, -0.0035550911416795607, 0.99999368064352), z_dir=(0, -0.9999936806435201, -0.003555091141679561))) as conge_porte_45_piece_3_section:
        with BuildLine():
            CenterArc((CONGE_PORTE_45_R * 0.396898310384, -CONGE_PORTE_45_R), CONGE_PORTE_45_R, 90, 43.296088669)
            Line((-CONGE_PORTE_45_R * 0.288870359094, -CONGE_PORTE_45_R * 0.27218042623), (0, 0))
            Line((0, 0), (CONGE_PORTE_45_R * 0.396898310384, 0))
        make_face()
    conge_porte_45_piece_3 = extrude(amount=34.484696932, mode=Mode.PRIVATE)
    conge_porte_45_piece_3 = split(conge_porte_45_piece_3, bisect_by=Plane(origin=(84.618432305, 0.000446855, -84.994223029), z_dir=(-0.0037730602417317648, 0.9999928819828732, 0)), keep=Keep.TOP, mode=Mode.PRIVATE)
    conge_porte_45_piece_3 = split(conge_porte_45_piece_3, bisect_by=Plane(origin=(84.524461153, 32.500062622, -84.967225586), z_dir=(0.002009836443436163, -0.9999966001902965, -0.001661374527015314)), keep=Keep.TOP, mode=Mode.PRIVATE)
    add(conge_porte_45_piece_3)
    with BuildSketch(Plane(origin=(-84.5, -0.992239506, -85.078193176), x_dir=(0, -0.003555091141679562, 0.99999368064352), z_dir=(0, 0.9999936806435201, 0.003555091141679562))) as conge_porte_45_piece_4_section:
        with BuildLine():
            CenterArc((CONGE_PORTE_45_R * 0.396898310384, -CONGE_PORTE_45_R), CONGE_PORTE_45_R, 90, 43.296088669)
            Line((-CONGE_PORTE_45_R * 0.288870359094, -CONGE_PORTE_45_R * 0.27218042623), (0, 0))
            Line((0, 0), (CONGE_PORTE_45_R * 0.396898310384, 0))
        make_face()
    conge_porte_45_piece_4 = extrude(amount=34.484696932, mode=Mode.PRIVATE)
    conge_porte_45_piece_4 = split(conge_porte_45_piece_4, bisect_by=Plane(origin=(-84.618432305, 0.000446855, -84.994223029), z_dir=(0.0037730602417317648, 0.9999928819828732, 0)), keep=Keep.TOP, mode=Mode.PRIVATE)
    conge_porte_45_piece_4 = split(conge_porte_45_piece_4, bisect_by=Plane(origin=(-84.524461153, 32.500062622, -84.967225586), z_dir=(-0.0020098364434361633, -0.9999966001902966, -0.0016613745270153137)), keep=Keep.TOP, mode=Mode.PRIVATE)
    add(conge_porte_45_piece_4)
    with BuildSketch(Plane(origin=(-84.5, -0.992239506, -85.078193176), x_dir=(0, -0.003555091141679562, 0.99999368064352), z_dir=(0, 0.9999936806435201, 0.003555091141679562))) as conge_porte_45_piece_5_section:
        with BuildLine():
            CenterArc((CONGE_PORTE_45_R * 0.396898310384, -CONGE_PORTE_45_R), CONGE_PORTE_45_R, 90, 43.296088669)
            Line((-CONGE_PORTE_45_R * 0.288870359094, -CONGE_PORTE_45_R * 0.27218042623), (0, 0))
            Line((0, 0), (CONGE_PORTE_45_R * 0.396898310384, 0))
        make_face()
    conge_porte_45_piece_5 = extrude(amount=34.484696932, mode=Mode.PRIVATE)
    conge_porte_45_piece_5 = split(conge_porte_45_piece_5, bisect_by=Plane(origin=(-84.651606735, 32.5, -85.118504897), z_dir=(0, 1, 0)), keep=Keep.TOP, mode=Mode.PRIVATE)
    conge_porte_45_piece_5 = split(conge_porte_45_piece_5, bisect_by=Plane(origin=(-84.651606162, 32.500569495, -85.118504424), z_dir=(-0.0020098364434361633, -0.9999966001902966, -0.0016613745270153137)), keep=Keep.TOP, mode=Mode.PRIVATE)
    add(conge_porte_45_piece_5)
    with BuildSketch(Plane(origin=(-84.5, -0.992239506, -85.078193176), x_dir=(0, -0.003555091141679562, 0.99999368064352), z_dir=(0, 0.9999936806435201, 0.003555091141679562))) as conge_porte_45_piece_6_section:
        with BuildLine():
            CenterArc((CONGE_PORTE_45_R * 0.396898310384, -CONGE_PORTE_45_R), CONGE_PORTE_45_R, 90, 43.296088669)
            Line((-CONGE_PORTE_45_R * 0.288870359094, -CONGE_PORTE_45_R * 0.27218042623), (0, 0))
            Line((0, 0), (CONGE_PORTE_45_R * 0.396898310384, 0))
        make_face()
    conge_porte_45_piece_6 = extrude(amount=34.484696932, mode=Mode.PRIVATE)
    conge_porte_45_piece_6 = split(conge_porte_45_piece_6, bisect_by=Plane(origin=(-84.497035788, 32.5, -84.725812597), z_dir=(0, -1, 0)), keep=Keep.TOP, mode=Mode.PRIVATE)
    conge_porte_45_piece_6 = split(conge_porte_45_piece_6, bisect_by=Plane(origin=(-84.497036184, 32.499606424, -84.725812924), z_dir=(0.0020098364434361633, 0.9999966001902966, 0.0016613745270153137)), keep=Keep.TOP, mode=Mode.PRIVATE)
    add(conge_porte_45_piece_6)


solid = part.part
